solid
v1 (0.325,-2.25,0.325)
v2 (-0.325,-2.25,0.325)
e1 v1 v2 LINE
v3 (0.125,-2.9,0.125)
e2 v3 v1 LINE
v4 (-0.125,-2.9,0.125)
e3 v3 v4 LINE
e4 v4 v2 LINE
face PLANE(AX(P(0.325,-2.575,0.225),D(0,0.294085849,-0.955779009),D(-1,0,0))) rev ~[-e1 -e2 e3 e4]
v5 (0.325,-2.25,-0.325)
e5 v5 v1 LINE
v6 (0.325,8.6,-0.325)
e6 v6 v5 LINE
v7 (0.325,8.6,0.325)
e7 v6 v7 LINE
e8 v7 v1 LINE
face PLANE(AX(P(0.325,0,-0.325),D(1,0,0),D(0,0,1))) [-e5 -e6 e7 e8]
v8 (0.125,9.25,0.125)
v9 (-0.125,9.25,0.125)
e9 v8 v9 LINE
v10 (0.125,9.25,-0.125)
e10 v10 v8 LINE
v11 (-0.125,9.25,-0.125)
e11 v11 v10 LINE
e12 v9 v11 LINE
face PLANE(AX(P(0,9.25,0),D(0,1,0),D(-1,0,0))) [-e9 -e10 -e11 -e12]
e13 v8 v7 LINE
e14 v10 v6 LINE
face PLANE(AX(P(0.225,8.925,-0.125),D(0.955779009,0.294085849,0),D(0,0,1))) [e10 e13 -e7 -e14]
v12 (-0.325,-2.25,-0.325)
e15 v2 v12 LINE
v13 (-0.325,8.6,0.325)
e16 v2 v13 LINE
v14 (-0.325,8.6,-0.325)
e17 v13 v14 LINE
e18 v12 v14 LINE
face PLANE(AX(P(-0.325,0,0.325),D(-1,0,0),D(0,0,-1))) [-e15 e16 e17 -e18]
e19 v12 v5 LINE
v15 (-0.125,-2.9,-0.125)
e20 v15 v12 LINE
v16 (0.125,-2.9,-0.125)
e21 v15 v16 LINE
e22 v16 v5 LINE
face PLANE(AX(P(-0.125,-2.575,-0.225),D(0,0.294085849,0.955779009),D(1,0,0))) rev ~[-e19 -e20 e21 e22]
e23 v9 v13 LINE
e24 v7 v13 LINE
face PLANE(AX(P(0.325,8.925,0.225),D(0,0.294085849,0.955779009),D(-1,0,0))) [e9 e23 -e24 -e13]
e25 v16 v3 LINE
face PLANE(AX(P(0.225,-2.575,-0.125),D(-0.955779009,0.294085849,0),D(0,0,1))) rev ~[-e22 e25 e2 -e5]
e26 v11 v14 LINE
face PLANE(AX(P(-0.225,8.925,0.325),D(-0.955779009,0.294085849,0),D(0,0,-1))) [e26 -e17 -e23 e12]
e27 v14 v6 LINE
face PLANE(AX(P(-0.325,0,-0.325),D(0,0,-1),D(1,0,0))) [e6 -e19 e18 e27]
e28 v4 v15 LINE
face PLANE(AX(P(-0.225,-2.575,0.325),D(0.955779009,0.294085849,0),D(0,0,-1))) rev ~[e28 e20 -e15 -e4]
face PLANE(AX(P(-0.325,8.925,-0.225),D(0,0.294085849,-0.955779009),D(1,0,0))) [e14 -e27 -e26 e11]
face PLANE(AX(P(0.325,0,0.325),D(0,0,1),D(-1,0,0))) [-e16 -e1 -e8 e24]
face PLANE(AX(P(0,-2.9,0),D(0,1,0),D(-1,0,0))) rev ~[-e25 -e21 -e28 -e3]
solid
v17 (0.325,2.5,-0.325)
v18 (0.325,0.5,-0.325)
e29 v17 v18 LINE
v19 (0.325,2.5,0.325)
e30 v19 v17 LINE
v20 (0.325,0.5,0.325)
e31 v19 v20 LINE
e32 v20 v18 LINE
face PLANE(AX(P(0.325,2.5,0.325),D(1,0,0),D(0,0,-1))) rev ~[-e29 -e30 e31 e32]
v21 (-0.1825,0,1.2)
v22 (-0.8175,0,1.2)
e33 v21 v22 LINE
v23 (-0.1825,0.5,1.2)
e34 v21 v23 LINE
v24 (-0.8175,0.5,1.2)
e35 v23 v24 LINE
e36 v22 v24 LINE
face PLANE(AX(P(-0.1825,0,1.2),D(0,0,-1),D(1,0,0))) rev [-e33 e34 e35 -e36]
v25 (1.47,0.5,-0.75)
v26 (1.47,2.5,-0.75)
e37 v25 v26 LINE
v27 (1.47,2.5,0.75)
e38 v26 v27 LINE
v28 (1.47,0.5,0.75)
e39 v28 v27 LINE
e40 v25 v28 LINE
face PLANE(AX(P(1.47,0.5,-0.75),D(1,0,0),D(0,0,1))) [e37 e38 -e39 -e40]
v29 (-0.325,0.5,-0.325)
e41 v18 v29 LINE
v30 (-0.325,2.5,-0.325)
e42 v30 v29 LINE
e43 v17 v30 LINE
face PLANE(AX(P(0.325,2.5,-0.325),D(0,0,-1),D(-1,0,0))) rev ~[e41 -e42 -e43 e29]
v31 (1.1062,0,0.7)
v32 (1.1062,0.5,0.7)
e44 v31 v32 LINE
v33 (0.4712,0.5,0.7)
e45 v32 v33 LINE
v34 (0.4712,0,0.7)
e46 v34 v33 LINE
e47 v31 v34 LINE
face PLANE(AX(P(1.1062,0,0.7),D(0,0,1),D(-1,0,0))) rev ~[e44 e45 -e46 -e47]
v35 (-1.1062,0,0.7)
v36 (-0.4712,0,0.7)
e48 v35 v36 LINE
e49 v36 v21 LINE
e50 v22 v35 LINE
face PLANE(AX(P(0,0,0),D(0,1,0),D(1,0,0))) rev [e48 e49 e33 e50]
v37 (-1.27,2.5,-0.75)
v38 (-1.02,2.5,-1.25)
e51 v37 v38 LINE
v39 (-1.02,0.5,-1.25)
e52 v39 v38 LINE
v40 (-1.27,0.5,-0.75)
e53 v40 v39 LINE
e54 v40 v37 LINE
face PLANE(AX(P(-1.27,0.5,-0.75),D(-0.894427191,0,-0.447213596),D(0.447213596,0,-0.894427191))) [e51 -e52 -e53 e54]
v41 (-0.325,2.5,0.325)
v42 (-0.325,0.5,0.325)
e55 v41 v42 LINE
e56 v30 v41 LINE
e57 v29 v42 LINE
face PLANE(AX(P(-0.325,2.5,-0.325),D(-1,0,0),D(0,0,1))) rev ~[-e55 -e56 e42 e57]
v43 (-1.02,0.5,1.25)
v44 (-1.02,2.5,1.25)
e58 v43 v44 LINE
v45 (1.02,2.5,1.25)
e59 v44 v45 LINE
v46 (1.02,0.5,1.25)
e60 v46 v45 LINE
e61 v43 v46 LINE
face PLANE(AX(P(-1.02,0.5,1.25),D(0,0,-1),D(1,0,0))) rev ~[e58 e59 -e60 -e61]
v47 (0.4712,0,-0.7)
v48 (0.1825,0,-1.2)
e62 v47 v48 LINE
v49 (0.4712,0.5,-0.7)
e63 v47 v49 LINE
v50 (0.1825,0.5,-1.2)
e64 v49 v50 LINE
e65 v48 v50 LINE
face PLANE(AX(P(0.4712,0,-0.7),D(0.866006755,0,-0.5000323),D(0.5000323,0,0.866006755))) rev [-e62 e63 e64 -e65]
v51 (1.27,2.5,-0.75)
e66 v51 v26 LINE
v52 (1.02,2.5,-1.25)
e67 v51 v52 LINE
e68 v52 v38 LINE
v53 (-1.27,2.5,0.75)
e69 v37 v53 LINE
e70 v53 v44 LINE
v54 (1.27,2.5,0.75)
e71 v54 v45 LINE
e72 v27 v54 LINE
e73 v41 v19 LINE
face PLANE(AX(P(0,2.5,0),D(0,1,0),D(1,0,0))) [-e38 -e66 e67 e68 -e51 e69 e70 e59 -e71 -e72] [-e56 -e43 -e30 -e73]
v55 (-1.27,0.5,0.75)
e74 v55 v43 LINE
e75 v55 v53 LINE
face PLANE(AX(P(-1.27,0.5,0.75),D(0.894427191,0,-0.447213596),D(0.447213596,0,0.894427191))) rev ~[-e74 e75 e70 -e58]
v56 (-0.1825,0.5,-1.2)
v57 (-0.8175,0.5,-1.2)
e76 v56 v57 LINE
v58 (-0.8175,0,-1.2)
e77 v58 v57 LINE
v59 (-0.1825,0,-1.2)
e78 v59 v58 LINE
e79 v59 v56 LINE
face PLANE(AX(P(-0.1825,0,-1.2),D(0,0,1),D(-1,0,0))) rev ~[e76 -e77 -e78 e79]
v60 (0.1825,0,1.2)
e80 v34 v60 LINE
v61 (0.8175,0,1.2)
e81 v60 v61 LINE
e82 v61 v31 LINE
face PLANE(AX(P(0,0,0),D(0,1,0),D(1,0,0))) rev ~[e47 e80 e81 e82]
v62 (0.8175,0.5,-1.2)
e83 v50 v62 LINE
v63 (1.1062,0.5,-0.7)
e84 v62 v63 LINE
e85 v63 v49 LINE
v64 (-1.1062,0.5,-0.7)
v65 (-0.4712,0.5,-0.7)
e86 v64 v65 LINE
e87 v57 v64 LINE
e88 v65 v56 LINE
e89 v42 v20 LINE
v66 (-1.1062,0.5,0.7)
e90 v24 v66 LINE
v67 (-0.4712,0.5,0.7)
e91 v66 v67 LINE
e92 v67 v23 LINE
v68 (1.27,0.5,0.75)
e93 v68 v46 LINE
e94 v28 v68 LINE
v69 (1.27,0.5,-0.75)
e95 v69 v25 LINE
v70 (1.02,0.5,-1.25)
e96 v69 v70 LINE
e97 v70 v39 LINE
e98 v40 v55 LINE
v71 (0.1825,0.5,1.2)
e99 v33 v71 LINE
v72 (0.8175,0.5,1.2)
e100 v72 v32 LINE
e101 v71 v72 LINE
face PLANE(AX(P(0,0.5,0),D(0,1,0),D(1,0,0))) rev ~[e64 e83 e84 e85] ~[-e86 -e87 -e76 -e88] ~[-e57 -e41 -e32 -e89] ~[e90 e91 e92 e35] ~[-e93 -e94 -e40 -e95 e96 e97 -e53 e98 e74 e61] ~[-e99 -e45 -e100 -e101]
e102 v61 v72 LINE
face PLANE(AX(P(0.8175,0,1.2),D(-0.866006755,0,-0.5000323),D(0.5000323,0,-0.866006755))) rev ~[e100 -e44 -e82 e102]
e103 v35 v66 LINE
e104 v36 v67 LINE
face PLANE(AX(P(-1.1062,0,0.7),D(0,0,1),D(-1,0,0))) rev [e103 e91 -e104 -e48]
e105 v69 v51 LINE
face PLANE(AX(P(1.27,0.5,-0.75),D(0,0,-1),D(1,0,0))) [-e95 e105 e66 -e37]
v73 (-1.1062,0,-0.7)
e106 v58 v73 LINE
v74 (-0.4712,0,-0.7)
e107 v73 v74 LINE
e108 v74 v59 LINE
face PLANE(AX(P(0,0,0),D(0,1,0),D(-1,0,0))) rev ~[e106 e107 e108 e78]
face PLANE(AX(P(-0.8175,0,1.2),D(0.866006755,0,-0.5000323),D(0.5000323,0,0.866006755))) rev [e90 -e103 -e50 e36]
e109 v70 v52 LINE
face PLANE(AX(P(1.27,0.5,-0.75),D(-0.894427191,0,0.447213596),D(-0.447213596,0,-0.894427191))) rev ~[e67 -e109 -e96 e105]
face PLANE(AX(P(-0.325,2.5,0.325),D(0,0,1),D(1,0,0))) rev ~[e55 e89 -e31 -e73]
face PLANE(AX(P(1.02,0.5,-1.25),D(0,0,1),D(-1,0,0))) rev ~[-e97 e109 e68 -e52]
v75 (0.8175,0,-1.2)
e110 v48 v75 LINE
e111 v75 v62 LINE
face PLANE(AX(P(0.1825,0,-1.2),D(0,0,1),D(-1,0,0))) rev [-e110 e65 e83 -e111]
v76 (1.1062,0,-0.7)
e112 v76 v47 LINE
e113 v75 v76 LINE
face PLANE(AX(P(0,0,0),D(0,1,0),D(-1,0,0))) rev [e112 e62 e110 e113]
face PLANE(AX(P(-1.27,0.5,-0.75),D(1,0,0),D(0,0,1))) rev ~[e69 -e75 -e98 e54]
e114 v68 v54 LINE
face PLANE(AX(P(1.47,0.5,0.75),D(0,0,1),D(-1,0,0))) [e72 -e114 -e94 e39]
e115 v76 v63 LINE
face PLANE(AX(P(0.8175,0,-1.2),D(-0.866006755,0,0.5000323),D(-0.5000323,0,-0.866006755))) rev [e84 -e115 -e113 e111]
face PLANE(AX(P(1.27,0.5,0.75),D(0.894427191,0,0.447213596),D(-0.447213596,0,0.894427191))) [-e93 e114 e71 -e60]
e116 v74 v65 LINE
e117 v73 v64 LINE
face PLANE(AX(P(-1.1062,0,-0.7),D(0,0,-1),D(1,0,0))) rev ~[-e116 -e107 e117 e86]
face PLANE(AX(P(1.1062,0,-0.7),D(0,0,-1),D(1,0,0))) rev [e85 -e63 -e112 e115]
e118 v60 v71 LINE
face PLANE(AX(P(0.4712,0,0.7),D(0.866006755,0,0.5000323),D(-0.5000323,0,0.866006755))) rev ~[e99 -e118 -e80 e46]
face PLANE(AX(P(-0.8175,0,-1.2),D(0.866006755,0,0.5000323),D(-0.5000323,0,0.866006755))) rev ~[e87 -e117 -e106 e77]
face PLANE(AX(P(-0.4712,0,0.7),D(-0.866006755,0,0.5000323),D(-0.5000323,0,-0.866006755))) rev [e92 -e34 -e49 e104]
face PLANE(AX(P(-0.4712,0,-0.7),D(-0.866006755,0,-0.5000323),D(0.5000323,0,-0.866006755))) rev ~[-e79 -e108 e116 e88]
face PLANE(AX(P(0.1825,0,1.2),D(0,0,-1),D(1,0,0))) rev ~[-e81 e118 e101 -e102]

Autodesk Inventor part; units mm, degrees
ref_plane "YZ Plane" through (0, 0, 0) normal (1, 0, 0) x (0, 1, 0)
ref_plane "XZ Plane" through (0, 0, 0) normal (0, 1, 0) x (-1, 0, 0)
ref_plane "XY Plane" through (0, 0, 0) normal (0, 0, 1) x (1, 0, 0)
sketch "Sketch1" plane through (0, 0, 0) normal (0, 1, 0) x (-1, 0, 0)
  line L0 (1.02, 1.25) -> (1.27, 0.75)
  line L1 (-1.02, 1.25) -> (1.02, 1.25)
  line L2 (-1.27, -0.75) -> (-1.27, 0.75)
  line L3 (-1.02, -1.25) -> (-1.27, -0.75)
  line L4 (1.02, -1.25) -> (-1.02, -1.25)
  line L5 (1.27, -0.75) -> (1.02, -1.25)
  line L6 (1.27, 0.75) -> (1.27, -0.75)
  line L7 (1.02, 1.25) -> (1.27, 0.75)
  line L8 (-1.02, 1.25) -> (1.02, 1.25)
  line L9 (-1.27, 0.75) -> (-1.02, 1.25)
  line L10 (0.815, 1.2) -> (0.18, 1.2)
  line L11 (1.1037, 0.7) -> (0.815, 1.2)
  line L12 (0.4687, 0.7) -> (1.1037, 0.7)
  line L13 (0.18, 1.2) -> (0.4687, 0.7)
  line L14 (-0.815, 1.2) -> (-1.1037, 0.7)
  line L15 (-0.18, 1.2) -> (-0.815, 1.2)
  line L16 (-0.4687, 0.7) -> (-0.18, 1.2)
  line L17 (-1.1037, 0.7) -> (-0.4687, 0.7)
  line L18 (0.815, -1.2) -> (1.1037, -0.7)
  line L19 (0.18, -1.2) -> (0.815, -1.2)
  line L20 (0.4687, -0.7) -> (0.18, -1.2)
  line L21 (1.1037, -0.7) -> (0.4687, -0.7)
  line L22 (-0.815, -1.2) -> (-0.18, -1.2)
  line L23 (-1.1037, -0.7) -> (-0.815, -1.2)
  line L24 (-0.4687, -0.7) -> (-1.1037, -0.7)
  line L25 (-0.18, -1.2) -> (-0.4687, -0.7)
  line L26 (-0.325, 0.325) -> (0.325, 0.325)
  line L27 (0.325, 0.325) -> (0.325, -0.325)
  line L28 (-0.325, -0.325) -> (0.325, -0.325)
  line L29 (-0.325, 0.325) -> (-0.325, -0.325)
  point P0 (0, 0)
  point P1 (0, 0)
sketch "Sketch3" plane through (0, 0, 0) normal (0, 1, 0) x (-1, 0, 0)
  line L0 (1.1062, -0.7) -> (0.4712, -0.7)
  line L1 (0.4712, -0.7) -> (0.1825, -1.2)
  line L2 (0.1825, -1.2) -> (0.8175, -1.2)
  line L3 (0.8175, -1.2) -> (1.1062, -0.7)
  line L4 (0.5, -1.2) -> (0.5, -0.7) construction
  point P0 (0, 0)
  dimension "d58" = 120
  dimension "d60" = 0.7
  dimension "d61" = 0.635
  dimension "d62" = 0.5
  dimension "d65" = 0.5
extrude "PCB-Level" add sketch "Sketch3" along normal blind 0.5
mirror "PCB-Level-Mirror1" about plane through (0, 0, 0) normal (1, 0, 0) of "PCB-Level"
mirror "PCB_Level-Mirror2" about plane through (0, 0, 0) normal (0, 0, 1) of "PCB-Level", "PCB-Level-Mirror1"
sketch "Sketch4" plane through (0, 0.5, 0) normal (0, 1, 0) x (1, 0, 0)
  line L0 (-1.02, -1.25) -> (1.02, -1.25)
  line L1 (1.27, -0.75) -> (1.27, 0.75)
  line L2 (1.02, 1.25) -> (-1.02, 1.25)
  line L3 (-1.27, 0.75) -> (-1.27, -0.75)
  line L4 (-1.27, -1.25) -> (1.27, 1.25) construction
  line L5 (1.27, -1.25) -> (-1.27, 1.25) construction
  line L6 (1.27, -0.75) -> (1.02, -1.25)
  line L7 (1.27, 0.75) -> (1.02, 1.25)
  line L8 (-1.27, 0.75) -> (-1.02, 1.25)
  line L9 (-1.27, -0.75) -> (-1.02, -1.25)
  line L10 (-1.02, -1.25) -> (1.02, -1.25)
  line L11 (1.27, 0.75) -> (1.47, 0.75)
  line L12 (1.47, 0.75) -> (1.47, -0.75)
  line L13 (1.47, -0.75) -> (1.27, -0.75)
  line L14 (1.27, -0.75) -> (1.27, 0.75)
  line L15 (-1.27, -0.75) -> (-1.47, -0.75)
  line L16 (-1.47, -0.75) -> (-1.47, 0.75)
  line L17 (-1.47, 0.75) -> (-1.27, 0.75)
  line L18 (-1.27, 0.75) -> (-1.27, -0.75)
  point P0 (0, 0)
  dimension "d68" = 2.54
  dimension "d69" = 2.5
  dimension "d70" = 0.5
  dimension "d71" = 0.25
  dimension "d72" = 0.5
  dimension "d73" = 0.25
  dimension "d74" = 0.5
  dimension "d75" = 0.25
  dimension "d76" = 0.5
  dimension "d77" = 0.25
  dimension "d122" = 0.2
  dimension "d123" = 0.2
sketch "Sketch6" plane through (0, 0, 0) normal (0, 1, 0) x (-1, 0, 0)
  line L0 (0.325, -0.325) -> (-0.325, -0.325) projected
  line L1 (-0.325, -0.325) -> (-0.325, 0.325) projected
  line L2 (-0.325, 0.325) -> (0.325, 0.325) projected
  line L3 (0.325, 0.325) -> (0.325, -0.325) projected
  point P0 (0, 0)
extrude "Pin-Ext" add sketch "Sketch6" along normal blind 9.25 and the other way blind 2.9 separate body
chamfer "Chamfer1" distance 0.2 distance2 0.65 1 edges at (0, 9.25, -0.325) measured on face at (-0.1083, 9.25, -0.1083)
chamfer "Chamfer2" distance 0.2 distance2 0.65 1 edges at (-0.325, 9.25, 0.1) measured on face at (0.1083, 9.25, 0.175)
chamfer "Chamfer3" distance 0.2 distance2 0.65 1 edges at (0.1, 9.25, 0.325) measured on face at (0.175, 9.25, 0.175)
chamfer "Chamfer4" distance 0.2 distance2 0.65 1 edges at (0.325, 9.25, 0) measured on face at (0.175, 9.25, 0.0417)
chamfer "Chamfer5" distance 0.2 distance2 0.65 1 edges at (-0.325, -2.9, 0) measured on face at (-0.1083, -2.9, -0.1083)
chamfer "Chamfer6" distance 0.2 distance2 0.65 1 edges at (0.1, -2.9, 0.325) measured on face at (0.025, -2.9, -0.1083)
chamfer "Chamfer7" distance 0.2 distance2 0.65 1 edges at (0.1, -2.9, -0.325) measured on face at (0.025, -2.9, -0.175)
chamfer "Chamfer8" distance 0.2 distance2 0.65 1 edges at (0.325, -2.9, 0) measured on face at (0.025, -2.9, -0.0417)
extrude "Extrusion9" add sketch "Sketch4" along normal blind 2 contours L9 L3 L8 L2 L7 L1 L6 L0 | L1 L11 L12 L13 bodies 1
sketch "Sketch9" plane through (0, 2.5, 0) normal (0, 1, 0) x (1, 0, 0)
  line L0 (-0.325, 0.325) -> (-0.325, -0.325) projected
  line L1 (0.325, 0.325) -> (-0.325, 0.325) projected
  line L2 (0.325, -0.325) -> (0.325, 0.325) projected
  line L3 (-0.325, -0.325) -> (0.325, -0.325) projected
  point P0 (0, 0)
extrude "Extrusion10" cut sketch "Sketch9" against normal through all bodies 1
equation "\"d74\" = d72"
equation "\"d75\" = d73"
equation "\"d76\" = d72"
equation "\"d77\" = d73"
properties part number "A-Pin"
